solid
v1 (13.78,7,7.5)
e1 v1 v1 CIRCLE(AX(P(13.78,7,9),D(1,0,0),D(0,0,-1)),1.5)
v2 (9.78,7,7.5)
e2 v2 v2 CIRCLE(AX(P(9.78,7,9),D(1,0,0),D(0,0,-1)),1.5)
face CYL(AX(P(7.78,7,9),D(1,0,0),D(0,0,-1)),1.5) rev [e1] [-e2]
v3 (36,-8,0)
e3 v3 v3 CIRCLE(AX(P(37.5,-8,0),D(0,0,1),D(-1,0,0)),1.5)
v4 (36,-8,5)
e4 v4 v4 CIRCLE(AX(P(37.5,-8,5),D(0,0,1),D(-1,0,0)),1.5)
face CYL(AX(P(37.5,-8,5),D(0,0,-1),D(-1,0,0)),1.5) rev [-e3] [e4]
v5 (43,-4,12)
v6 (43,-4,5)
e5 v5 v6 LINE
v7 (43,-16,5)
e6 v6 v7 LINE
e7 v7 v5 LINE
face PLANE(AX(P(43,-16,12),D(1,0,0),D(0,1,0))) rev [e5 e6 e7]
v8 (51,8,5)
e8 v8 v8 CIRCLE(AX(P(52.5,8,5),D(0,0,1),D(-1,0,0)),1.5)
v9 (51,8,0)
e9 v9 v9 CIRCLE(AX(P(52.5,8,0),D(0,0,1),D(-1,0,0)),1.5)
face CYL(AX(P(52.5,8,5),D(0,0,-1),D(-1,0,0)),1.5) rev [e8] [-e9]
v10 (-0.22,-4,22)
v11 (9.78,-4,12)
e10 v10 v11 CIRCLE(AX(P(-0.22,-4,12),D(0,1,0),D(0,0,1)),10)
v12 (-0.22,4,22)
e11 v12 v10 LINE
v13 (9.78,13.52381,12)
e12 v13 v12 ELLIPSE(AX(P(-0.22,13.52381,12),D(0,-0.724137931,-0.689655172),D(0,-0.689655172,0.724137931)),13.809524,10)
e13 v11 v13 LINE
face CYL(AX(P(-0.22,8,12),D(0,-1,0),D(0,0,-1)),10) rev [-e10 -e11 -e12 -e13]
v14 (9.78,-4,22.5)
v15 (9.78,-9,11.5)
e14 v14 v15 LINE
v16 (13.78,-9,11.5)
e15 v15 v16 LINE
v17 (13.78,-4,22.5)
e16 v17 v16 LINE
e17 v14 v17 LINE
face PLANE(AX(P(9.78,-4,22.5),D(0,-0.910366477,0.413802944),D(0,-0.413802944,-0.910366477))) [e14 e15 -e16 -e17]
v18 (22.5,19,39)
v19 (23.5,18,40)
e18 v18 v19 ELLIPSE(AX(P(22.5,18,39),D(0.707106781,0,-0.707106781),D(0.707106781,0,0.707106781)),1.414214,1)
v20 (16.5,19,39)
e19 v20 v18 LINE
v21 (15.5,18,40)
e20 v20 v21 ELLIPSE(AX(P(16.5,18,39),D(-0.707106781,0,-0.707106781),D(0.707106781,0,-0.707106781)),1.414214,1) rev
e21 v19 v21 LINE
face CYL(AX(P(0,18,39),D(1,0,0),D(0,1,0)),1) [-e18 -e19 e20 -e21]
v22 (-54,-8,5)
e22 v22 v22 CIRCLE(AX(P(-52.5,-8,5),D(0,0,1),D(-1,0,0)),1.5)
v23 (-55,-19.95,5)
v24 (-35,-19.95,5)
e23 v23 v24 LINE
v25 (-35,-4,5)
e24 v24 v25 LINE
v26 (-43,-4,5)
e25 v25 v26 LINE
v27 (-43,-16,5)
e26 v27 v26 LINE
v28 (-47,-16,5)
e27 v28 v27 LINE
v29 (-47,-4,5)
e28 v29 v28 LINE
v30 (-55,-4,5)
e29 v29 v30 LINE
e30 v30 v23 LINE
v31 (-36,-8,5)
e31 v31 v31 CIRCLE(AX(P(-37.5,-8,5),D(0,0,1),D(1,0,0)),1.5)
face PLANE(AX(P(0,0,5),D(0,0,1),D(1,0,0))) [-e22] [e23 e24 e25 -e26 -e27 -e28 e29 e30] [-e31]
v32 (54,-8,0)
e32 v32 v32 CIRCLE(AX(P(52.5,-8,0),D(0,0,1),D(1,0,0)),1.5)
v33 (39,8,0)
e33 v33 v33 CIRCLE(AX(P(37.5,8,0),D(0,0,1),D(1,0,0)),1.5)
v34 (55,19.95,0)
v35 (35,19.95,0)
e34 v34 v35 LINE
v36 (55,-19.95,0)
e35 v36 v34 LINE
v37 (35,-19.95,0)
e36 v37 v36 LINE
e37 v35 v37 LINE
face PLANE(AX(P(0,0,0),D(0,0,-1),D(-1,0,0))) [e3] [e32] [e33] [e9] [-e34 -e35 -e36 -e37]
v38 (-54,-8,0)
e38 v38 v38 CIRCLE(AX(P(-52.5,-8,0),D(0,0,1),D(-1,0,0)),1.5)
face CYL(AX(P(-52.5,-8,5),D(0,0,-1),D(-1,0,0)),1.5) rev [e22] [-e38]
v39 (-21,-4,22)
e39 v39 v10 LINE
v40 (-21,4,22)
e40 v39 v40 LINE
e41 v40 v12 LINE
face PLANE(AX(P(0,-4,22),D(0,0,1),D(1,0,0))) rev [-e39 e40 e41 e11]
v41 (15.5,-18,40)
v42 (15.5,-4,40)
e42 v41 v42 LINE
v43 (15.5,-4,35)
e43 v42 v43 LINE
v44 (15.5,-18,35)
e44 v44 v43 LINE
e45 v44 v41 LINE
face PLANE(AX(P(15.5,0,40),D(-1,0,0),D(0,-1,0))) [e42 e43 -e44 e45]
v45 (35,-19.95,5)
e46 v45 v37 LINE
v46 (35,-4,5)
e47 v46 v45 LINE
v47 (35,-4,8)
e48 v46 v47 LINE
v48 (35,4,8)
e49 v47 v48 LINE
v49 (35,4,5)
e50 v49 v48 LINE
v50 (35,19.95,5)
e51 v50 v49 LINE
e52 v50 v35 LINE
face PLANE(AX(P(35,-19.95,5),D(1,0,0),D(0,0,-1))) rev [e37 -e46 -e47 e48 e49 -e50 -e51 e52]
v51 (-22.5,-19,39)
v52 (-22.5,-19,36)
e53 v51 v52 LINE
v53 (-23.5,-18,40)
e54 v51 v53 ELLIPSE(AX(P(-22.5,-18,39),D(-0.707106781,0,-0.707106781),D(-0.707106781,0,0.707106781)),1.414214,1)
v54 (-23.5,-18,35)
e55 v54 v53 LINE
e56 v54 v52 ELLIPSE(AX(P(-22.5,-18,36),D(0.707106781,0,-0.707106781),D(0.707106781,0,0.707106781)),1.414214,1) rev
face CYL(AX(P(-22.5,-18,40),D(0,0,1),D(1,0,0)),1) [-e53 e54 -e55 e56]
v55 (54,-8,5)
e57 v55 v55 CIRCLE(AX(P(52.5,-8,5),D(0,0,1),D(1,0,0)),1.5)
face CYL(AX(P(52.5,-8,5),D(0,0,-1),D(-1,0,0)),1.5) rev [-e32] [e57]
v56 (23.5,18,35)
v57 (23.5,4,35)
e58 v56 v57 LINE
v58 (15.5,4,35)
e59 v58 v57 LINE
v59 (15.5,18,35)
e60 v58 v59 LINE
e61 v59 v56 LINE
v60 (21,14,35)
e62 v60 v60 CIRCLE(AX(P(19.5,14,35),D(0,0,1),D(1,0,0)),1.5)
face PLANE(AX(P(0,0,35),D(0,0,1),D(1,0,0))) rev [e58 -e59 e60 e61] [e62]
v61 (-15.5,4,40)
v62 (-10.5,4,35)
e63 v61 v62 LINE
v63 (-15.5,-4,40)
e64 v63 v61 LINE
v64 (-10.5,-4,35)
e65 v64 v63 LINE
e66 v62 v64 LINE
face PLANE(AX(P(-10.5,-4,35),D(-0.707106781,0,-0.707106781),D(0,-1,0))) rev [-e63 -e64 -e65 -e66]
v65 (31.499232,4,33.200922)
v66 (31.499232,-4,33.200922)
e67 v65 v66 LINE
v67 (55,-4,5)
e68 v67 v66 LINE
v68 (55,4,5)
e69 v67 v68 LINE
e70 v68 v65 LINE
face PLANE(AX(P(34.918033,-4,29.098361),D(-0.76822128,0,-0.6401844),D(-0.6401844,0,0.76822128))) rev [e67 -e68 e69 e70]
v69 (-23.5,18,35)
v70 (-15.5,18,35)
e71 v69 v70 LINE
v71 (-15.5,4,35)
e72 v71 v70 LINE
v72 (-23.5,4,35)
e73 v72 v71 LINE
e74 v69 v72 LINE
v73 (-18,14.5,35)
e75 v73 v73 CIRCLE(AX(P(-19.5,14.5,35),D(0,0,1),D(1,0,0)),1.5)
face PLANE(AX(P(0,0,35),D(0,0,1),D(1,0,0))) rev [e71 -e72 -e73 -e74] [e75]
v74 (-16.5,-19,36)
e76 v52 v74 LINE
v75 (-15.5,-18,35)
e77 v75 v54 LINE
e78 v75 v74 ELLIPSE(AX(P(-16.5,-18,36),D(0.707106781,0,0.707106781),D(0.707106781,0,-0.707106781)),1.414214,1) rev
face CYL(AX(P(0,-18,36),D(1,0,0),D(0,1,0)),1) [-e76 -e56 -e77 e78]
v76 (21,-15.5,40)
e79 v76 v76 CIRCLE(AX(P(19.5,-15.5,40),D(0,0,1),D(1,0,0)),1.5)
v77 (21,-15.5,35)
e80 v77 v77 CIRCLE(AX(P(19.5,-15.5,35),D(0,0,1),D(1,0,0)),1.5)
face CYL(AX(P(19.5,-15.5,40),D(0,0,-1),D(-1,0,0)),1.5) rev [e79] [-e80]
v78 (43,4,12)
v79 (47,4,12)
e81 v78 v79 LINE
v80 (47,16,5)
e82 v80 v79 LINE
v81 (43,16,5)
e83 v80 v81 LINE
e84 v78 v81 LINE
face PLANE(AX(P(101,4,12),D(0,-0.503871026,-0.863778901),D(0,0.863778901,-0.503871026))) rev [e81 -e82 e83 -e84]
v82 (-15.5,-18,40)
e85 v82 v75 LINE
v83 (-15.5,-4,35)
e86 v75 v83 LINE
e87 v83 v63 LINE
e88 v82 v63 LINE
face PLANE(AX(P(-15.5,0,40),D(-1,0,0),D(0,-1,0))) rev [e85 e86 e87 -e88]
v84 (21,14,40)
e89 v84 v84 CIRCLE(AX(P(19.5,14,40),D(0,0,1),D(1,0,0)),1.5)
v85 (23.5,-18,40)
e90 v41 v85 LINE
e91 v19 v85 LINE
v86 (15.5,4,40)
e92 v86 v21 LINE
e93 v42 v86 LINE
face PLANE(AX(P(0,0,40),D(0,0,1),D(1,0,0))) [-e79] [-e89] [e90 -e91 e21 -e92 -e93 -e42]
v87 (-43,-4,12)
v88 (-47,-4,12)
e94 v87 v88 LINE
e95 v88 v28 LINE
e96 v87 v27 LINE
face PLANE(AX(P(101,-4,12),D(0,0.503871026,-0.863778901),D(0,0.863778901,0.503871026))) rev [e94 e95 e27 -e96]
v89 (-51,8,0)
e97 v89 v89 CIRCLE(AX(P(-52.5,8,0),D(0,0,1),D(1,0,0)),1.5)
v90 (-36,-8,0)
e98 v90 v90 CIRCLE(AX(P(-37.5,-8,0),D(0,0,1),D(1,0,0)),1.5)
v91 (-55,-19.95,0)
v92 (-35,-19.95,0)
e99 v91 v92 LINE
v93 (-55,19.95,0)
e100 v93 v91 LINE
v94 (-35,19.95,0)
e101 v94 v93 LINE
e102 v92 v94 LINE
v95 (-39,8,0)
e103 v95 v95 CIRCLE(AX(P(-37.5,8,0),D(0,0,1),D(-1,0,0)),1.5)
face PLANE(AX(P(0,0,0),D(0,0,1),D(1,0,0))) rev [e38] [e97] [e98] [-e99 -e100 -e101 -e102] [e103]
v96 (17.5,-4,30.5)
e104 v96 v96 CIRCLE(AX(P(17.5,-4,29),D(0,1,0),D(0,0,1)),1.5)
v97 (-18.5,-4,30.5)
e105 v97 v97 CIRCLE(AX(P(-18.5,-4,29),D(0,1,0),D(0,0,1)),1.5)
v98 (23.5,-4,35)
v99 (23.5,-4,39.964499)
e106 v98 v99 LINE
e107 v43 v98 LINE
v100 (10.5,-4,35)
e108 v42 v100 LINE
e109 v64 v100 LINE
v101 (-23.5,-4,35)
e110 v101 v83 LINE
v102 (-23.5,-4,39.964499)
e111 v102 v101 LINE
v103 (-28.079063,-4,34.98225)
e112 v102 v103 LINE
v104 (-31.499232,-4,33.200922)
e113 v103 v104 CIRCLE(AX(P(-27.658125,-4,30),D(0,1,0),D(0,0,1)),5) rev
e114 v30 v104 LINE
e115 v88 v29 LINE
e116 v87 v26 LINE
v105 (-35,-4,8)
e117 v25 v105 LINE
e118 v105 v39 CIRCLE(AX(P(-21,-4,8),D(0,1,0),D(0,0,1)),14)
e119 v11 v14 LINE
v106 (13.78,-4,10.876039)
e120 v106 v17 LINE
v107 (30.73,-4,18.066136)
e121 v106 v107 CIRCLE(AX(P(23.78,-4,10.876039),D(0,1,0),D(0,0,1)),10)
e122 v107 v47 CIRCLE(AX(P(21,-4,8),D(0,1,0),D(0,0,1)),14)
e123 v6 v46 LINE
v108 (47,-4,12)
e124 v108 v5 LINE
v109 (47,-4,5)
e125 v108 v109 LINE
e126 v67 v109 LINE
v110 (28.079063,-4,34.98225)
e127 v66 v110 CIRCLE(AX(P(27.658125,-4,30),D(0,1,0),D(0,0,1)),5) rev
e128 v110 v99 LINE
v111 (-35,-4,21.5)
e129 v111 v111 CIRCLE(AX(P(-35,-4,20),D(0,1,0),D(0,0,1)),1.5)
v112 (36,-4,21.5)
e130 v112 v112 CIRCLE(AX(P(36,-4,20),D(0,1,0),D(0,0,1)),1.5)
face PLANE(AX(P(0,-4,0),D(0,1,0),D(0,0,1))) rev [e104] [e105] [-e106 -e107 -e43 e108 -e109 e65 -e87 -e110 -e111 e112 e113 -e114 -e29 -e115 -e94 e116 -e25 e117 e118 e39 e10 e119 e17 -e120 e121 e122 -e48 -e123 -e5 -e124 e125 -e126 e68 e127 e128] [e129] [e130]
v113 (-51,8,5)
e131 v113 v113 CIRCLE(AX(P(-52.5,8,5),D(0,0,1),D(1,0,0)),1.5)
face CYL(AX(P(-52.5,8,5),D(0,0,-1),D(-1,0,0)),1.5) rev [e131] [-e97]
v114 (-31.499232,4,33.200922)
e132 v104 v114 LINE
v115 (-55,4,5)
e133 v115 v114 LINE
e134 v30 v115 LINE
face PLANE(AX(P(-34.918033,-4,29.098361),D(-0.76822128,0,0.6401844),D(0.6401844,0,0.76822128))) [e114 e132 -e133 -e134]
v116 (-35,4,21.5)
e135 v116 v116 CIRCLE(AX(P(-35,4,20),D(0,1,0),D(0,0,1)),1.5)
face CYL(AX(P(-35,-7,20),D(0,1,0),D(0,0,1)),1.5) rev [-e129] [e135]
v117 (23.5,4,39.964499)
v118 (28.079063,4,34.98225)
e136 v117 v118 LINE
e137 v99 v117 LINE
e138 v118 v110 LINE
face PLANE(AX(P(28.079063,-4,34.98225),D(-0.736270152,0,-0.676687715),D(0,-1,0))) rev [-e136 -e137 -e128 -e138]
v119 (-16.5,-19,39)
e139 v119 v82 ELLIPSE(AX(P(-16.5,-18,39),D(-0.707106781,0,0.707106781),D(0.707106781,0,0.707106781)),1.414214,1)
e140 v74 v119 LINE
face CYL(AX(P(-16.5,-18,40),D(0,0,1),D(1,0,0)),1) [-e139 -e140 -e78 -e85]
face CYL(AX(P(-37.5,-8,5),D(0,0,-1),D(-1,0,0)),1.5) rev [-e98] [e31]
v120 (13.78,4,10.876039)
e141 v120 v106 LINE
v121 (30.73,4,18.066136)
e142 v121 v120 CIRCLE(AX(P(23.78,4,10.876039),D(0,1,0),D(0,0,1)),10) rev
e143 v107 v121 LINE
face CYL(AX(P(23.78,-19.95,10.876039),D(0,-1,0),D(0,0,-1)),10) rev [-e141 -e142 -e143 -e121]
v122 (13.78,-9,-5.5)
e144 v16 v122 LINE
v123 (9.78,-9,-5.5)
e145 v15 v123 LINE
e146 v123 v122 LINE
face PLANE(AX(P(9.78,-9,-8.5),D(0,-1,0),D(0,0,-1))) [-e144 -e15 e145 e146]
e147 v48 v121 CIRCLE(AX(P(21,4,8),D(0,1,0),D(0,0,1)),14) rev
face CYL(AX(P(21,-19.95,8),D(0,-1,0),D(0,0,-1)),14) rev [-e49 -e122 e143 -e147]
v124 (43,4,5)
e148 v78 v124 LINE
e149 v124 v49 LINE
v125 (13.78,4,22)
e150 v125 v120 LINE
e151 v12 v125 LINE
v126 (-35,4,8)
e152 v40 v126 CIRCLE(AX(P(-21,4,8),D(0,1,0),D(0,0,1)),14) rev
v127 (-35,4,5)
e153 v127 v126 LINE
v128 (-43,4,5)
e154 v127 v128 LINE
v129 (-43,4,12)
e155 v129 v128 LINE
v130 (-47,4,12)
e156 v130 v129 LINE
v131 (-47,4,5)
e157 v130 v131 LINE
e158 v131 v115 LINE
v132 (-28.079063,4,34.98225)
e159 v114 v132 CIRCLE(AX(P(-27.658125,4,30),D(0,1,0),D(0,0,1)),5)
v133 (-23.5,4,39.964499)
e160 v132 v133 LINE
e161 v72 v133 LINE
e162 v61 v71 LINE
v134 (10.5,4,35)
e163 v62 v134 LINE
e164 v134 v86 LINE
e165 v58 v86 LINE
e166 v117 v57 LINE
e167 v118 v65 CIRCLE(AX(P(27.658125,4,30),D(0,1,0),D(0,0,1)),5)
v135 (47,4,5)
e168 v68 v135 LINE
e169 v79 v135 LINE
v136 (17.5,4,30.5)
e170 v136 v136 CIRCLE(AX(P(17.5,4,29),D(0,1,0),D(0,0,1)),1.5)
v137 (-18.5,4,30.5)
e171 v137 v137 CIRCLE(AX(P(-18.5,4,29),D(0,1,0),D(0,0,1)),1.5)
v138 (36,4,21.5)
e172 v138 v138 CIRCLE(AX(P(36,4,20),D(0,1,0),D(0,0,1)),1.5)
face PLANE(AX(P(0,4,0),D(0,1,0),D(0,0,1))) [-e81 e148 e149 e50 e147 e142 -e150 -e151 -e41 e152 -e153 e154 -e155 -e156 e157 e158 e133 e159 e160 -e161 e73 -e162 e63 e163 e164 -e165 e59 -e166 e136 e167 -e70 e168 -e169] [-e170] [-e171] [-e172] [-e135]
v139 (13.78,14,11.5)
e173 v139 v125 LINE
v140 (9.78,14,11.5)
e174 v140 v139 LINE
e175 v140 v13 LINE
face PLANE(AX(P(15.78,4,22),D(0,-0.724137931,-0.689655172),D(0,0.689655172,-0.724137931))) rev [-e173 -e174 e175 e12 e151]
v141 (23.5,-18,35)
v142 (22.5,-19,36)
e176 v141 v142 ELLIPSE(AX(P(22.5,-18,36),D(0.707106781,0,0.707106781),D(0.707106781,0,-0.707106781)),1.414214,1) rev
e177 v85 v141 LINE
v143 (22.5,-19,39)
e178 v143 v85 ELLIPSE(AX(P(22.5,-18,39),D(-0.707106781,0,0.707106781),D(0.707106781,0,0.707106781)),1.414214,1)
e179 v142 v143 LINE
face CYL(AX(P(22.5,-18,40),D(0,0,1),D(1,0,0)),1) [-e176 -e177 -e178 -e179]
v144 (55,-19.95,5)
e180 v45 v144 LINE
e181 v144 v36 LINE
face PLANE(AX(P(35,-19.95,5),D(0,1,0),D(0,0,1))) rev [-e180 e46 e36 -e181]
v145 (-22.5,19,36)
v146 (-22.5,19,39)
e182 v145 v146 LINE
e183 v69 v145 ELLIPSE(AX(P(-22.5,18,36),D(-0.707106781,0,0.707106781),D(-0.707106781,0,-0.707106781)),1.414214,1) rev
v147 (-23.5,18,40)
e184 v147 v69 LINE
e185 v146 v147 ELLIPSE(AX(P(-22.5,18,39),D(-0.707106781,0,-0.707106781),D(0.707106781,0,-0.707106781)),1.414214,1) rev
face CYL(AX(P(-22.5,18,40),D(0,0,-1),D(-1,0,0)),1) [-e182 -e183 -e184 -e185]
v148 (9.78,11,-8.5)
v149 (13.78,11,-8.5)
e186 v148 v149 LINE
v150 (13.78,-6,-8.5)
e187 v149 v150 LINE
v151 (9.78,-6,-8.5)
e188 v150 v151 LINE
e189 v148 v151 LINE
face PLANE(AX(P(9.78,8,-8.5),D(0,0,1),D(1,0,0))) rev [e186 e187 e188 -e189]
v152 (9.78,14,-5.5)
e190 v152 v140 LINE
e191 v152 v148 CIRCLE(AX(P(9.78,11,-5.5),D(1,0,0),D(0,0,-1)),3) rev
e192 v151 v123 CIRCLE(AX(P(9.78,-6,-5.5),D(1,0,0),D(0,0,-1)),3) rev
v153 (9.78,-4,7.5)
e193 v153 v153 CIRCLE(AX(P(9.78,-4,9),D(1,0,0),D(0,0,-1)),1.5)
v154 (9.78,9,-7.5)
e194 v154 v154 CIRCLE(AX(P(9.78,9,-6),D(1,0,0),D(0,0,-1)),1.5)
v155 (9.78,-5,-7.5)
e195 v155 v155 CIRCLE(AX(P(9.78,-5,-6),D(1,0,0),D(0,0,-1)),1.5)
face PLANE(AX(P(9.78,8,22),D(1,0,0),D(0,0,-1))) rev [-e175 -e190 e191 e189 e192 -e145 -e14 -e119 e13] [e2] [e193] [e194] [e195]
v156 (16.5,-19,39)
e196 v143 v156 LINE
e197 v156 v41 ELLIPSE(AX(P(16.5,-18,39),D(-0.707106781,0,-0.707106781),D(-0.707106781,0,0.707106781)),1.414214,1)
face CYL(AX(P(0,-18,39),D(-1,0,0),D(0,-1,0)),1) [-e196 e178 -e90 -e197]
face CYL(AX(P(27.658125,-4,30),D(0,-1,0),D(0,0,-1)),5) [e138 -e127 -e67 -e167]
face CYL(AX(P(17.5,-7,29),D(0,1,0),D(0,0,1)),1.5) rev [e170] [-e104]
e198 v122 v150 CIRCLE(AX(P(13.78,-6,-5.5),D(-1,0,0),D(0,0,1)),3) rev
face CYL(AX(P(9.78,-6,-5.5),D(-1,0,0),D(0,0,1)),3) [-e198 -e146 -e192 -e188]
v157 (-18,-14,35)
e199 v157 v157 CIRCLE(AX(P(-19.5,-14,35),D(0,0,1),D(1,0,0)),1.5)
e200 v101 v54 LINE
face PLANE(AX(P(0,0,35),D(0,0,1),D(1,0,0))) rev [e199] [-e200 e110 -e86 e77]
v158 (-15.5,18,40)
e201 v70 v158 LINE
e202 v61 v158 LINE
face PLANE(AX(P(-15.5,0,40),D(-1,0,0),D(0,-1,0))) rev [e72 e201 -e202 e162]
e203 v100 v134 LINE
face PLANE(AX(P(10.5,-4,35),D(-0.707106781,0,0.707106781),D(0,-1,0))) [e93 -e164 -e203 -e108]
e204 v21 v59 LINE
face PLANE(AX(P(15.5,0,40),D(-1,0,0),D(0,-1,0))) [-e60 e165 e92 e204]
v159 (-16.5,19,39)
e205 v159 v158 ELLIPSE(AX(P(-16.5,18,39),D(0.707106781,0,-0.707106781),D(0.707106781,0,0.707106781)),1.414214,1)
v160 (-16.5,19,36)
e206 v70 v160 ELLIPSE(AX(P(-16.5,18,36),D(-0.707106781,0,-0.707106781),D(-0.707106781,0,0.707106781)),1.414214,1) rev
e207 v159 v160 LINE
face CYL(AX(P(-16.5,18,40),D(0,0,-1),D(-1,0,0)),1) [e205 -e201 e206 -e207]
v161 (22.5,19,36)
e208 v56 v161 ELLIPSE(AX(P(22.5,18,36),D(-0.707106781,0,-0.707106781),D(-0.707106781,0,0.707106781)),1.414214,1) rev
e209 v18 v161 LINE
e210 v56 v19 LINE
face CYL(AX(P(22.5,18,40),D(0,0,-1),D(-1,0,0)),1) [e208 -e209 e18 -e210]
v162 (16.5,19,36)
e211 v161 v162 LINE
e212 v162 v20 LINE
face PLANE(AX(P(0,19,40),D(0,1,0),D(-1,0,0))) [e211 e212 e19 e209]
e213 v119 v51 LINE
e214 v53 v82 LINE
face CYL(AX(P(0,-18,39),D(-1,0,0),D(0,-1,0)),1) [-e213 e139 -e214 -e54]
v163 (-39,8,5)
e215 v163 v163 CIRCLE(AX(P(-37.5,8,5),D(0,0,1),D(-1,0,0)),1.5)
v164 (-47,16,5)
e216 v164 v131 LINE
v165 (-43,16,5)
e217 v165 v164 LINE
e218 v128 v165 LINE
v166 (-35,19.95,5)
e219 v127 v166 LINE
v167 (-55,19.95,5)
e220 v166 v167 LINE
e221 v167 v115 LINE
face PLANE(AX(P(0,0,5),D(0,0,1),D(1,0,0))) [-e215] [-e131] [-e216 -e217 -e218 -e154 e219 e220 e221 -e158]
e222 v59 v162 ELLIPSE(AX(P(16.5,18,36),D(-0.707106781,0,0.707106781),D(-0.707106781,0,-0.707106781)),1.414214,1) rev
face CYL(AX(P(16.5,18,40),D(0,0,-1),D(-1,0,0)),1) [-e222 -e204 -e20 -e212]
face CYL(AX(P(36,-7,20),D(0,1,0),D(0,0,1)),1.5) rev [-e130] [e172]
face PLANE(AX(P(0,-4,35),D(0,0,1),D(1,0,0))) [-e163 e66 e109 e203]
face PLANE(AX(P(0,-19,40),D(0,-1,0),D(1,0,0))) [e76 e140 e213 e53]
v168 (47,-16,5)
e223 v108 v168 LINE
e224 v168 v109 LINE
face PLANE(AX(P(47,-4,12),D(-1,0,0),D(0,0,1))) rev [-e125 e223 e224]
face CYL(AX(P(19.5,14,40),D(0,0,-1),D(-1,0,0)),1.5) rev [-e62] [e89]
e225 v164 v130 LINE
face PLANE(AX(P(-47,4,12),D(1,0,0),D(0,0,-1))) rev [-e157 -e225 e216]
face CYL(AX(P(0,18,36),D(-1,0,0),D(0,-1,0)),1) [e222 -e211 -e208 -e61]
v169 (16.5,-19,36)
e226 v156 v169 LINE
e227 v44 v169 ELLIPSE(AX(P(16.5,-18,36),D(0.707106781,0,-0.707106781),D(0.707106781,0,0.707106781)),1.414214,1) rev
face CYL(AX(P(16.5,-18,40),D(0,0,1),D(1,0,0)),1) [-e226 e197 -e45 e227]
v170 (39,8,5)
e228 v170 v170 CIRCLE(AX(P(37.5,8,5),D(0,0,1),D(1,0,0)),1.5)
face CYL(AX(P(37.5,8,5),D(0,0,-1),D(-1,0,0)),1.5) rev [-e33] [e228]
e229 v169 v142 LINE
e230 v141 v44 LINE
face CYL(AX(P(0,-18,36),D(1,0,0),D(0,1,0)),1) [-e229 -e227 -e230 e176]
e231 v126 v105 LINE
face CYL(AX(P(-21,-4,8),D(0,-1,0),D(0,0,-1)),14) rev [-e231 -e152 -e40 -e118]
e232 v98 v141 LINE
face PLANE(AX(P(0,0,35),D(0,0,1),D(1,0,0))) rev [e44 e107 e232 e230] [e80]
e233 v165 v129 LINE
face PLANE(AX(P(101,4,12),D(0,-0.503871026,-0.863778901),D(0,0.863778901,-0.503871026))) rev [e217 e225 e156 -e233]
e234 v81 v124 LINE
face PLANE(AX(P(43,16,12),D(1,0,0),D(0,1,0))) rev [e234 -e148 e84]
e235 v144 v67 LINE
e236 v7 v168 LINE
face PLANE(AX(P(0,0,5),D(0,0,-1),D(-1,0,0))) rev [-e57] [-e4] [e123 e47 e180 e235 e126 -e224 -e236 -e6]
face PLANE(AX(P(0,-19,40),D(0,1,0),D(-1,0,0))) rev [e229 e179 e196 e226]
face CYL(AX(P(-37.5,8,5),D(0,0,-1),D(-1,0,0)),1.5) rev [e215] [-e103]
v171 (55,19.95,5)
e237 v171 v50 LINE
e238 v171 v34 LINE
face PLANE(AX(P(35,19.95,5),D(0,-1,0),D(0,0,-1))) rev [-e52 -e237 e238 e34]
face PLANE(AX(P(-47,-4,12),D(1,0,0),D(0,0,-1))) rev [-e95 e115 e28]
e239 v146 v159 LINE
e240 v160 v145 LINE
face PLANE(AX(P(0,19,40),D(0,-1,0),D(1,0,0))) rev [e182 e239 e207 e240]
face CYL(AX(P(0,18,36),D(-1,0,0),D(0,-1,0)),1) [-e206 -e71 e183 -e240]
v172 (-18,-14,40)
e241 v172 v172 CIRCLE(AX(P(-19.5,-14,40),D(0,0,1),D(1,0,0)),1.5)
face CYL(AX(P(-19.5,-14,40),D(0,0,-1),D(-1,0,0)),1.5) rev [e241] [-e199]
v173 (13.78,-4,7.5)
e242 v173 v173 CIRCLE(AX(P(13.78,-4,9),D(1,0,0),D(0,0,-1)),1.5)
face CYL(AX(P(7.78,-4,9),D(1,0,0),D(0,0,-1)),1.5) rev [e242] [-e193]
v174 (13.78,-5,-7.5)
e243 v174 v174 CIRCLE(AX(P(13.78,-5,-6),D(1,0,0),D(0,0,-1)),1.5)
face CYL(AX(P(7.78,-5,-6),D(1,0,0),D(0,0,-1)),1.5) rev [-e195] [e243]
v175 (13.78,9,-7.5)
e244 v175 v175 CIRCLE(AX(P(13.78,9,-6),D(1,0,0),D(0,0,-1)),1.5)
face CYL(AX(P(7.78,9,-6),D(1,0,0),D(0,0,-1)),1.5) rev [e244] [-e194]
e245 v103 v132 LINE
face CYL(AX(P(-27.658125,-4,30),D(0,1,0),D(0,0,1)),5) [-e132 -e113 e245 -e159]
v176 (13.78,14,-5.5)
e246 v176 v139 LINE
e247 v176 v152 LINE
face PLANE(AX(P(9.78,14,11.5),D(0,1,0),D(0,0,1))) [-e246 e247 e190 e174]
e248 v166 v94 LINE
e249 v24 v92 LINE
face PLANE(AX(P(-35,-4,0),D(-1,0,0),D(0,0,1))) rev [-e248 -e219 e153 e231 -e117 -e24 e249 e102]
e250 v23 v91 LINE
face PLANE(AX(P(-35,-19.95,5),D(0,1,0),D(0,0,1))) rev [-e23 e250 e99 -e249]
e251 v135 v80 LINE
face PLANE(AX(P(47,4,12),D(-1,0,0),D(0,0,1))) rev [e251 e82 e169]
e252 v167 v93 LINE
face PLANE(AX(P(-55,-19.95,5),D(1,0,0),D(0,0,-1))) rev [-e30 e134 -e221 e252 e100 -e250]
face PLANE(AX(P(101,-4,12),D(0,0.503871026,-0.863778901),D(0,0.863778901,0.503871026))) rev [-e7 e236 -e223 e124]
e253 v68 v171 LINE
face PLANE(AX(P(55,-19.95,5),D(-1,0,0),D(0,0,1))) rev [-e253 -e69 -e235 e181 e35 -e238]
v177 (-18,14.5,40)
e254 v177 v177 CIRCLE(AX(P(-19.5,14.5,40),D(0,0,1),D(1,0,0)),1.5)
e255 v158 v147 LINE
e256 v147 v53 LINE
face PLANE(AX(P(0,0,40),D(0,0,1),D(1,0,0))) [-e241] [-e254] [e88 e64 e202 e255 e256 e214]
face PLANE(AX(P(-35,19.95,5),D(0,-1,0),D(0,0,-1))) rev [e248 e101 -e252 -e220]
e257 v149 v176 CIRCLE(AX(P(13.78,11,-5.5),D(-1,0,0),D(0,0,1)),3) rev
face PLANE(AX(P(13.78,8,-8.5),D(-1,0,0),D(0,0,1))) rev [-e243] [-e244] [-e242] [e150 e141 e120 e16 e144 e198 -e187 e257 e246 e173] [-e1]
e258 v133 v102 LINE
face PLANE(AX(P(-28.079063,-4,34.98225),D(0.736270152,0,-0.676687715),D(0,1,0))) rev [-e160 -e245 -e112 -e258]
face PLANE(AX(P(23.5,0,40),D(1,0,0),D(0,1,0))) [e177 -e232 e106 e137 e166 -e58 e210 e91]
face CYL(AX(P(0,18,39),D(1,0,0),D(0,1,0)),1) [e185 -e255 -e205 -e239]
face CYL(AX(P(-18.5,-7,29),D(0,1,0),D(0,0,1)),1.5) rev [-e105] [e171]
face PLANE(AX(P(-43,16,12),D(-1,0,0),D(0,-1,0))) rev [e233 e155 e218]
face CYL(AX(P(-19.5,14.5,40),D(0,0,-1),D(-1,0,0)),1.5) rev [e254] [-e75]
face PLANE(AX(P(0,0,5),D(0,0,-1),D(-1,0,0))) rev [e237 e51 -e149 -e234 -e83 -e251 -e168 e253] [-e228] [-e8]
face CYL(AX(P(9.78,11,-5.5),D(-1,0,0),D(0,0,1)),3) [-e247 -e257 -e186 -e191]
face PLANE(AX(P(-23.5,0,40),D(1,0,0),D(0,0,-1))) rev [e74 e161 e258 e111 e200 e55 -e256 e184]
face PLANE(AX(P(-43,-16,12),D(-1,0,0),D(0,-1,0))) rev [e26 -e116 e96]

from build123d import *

# Parameters (mm, degrees)
SKETCH_1_W           = 20
SKETCH_1_H           = 39.9
SKETCH_1_R           = 1.5
EXTRUDE_1_DEPTH      = 5
EXTRUDE_1_2_DEPTH    = 5
EXTRUDE_2_DEPTH      = 4
EXTRUDE_2_DEPTH_BACK = 4
FILLET_1_R           = 14
SKETCH_3_R           = 1.5
CUT_EXTRUDE_1_DEPTH  = 11
FILLET_2_R           = 5
SKETCH_4_W           = 4
SKETCH_4_H           = 12
EXTRUDE_3_DEPTH      = 7
CUT_EXTRUDE_2_DEPTH  = 148
EXTRUDE_4_DEPTH      = 4
EXTRUDE_4_DEPTH_BACK = 8
SKETCH_6_W           = 4
SKETCH_6_H           = 30.5
SKETCH_10_W          = 20
SKETCH_10_H          = 6
SKETCH_10_H_2        = 5
EXTRUDE_6_DEPTH      = 4
CUT_EXTRUDE_5_DEPTH  = 6
SKETCH_13_R          = 1.5
CUT_EXTRUDE_6_DEPTH  = 6
EXTRUDE_8_DEPTH      = 4
SKETCH_19_W          = 8
SKETCH_19_H          = 15
SKETCH_19_R          = 1.5
SKETCH_19_H_2        = 8
EXTRUDE_9_DEPTH      = 5
CHAMFER_START        = -4
CHAMFER_1_DEPTH      = 8
FILLET_13_R          = 1
FILLET_14_R          = 10
FILLET_15_R          = 3


with BuildPart() as part:
    # 草图1 → 凸台-拉伸1 (new body)
    with BuildSketch(Plane.XY):
        with Locations((45, 0)):
            Rectangle(SKETCH_1_W, SKETCH_1_H)
        with Locations((37.5, 8)):
            Circle(SKETCH_1_R, mode=Mode.SUBTRACT)
        with Locations(Location((52.5, 8, 0), (0, 0, 180))):
            Circle(SKETCH_1_R, mode=Mode.SUBTRACT)
        with Locations((52.5, -8)):
            Circle(SKETCH_1_R, mode=Mode.SUBTRACT)
        with Locations(Location((37.5, -8, 0), (0, 0, 180))):
            Circle(SKETCH_1_R, mode=Mode.SUBTRACT)
    extrude(amount=EXTRUDE_1_DEPTH)



with BuildPart() as body_2:
    # 草图1 → Extrude 1 2 (new body)
    with BuildSketch(Plane.XY):
        with Locations((-45, 0)):
            Rectangle(SKETCH_1_W, SKETCH_1_H)
        with Locations((-37.5, -8)):
            Circle(SKETCH_1_R, mode=Mode.SUBTRACT)
        with Locations(Location((-52.5, -8, 0), (0, 0, 180))):
            Circle(SKETCH_1_R, mode=Mode.SUBTRACT)
        with Locations((-52.5, 8)):
            Circle(SKETCH_1_R, mode=Mode.SUBTRACT)
        with Locations(Location((-37.5, 8, 0), (0, 0, 180))):
            Circle(SKETCH_1_R, mode=Mode.SUBTRACT)
    extrude(amount=EXTRUDE_1_2_DEPTH)


with BuildPart() as part_1:
    add(part.part)

    add(body_2.part)  # 凸台-拉伸2 merges body 2
    # 草图2 → 凸台-拉伸2 (add, two sides: drawn at the far end of the back side and taken through both)
    with BuildSketch(Plane(origin=(0, 0, 0), x_dir=(1, 0, 0), z_dir=(0, 1, 0)).offset(-EXTRUDE_2_DEPTH_BACK)):
        Polygon((-35, -5), (-55, -5), (-30, -35), (30, -35), (55, -5), (35, -5), (35, -22), (-35, -22), align=None)
    extrude(amount=EXTRUDE_2_DEPTH + EXTRUDE_2_DEPTH_BACK)

    # 圆角1
    fillet_1_edges = [part_1.edges().sort_by_distance(p)[0] for p in [
        (-35, 0, 22),
        (35, 0, 22),
    ]]
    fillet(fillet_1_edges, radius=FILLET_1_R)

    # 草图3 → 切除-拉伸1 (cut)
    with BuildSketch(Plane(origin=(0, 4, 0), x_dir=(1, 0, 0), z_dir=(0, 1, 0))):
        with Locations(Location((17.5, -29, 0), (0, 0, 270))):
            Circle(SKETCH_3_R)
        with Locations(Location((-18.5, -29, 0), (0, 0, 270))):
            Circle(SKETCH_3_R)
        with Locations(Location((-35, -20, 0), (0, 0, 270))):
            Circle(SKETCH_3_R)
        with Locations(Location((36, -20, 0), (0, 0, 270))):
            Circle(SKETCH_3_R)
    extrude(amount=-CUT_EXTRUDE_1_DEPTH, mode=Mode.SUBTRACT)

    # 圆角2
    fillet_2_edges = [part_1.edges().sort_by_distance(p)[0] for p in [
        (30, 0, 35),
        (-30, 0, 35),
    ]]
    fillet(fillet_2_edges, radius=FILLET_2_R)

    # 草图4 → 凸台-拉伸3 (add)
    with BuildSketch(Plane.XY.offset(5)):
        with Locations((-45, 10)):
            Rectangle(SKETCH_4_W, SKETCH_4_H)
        with Locations((-45, -10)):
            Rectangle(SKETCH_4_W, SKETCH_4_H)
        with Locations((45, -10)):
            Rectangle(SKETCH_4_W, SKETCH_4_H)
        with Locations((45, 10)):
            Rectangle(SKETCH_4_W, SKETCH_4_H)
    extrude(amount=EXTRUDE_3_DEPTH)

    # 草图5 → 切除-拉伸2 (cut)
    with BuildSketch(Plane.ZY.offset(47)):
        Polygon((5, 16), (12, 16), (12, 4), align=None)
        Polygon((12, -16), (12, -4), (5, -16), align=None)
    extrude(amount=-CUT_EXTRUDE_2_DEPTH, mode=Mode.SUBTRACT)

    # 草图6 → 凸台-拉伸4 (add, two sides: drawn at the far end of the back side and taken through both)
    with BuildSketch(Plane(origin=(0, 4, 0), x_dir=(1, 0, 0), z_dir=(0, 1, 0)).offset(-EXTRUDE_4_DEPTH_BACK)):
        with Locations((11.78, -6.75)):
            Rectangle(SKETCH_6_W, SKETCH_6_H)
    extrude(amount=EXTRUDE_4_DEPTH + EXTRUDE_4_DEPTH_BACK)

    # 草图10 → 凸台-拉伸6 (add)
    with BuildSketch(Plane(origin=(13.78, 0, 0), x_dir=(0, 0, -1), z_dir=(1, 0, 0))):
        with Locations((-1.5, 11)):
            Rectangle(SKETCH_10_W, SKETCH_10_H)
        with Locations((-1.5, -6.5)):
            Rectangle(SKETCH_10_W, SKETCH_10_H_2)
    extrude(amount=-EXTRUDE_6_DEPTH)

    # 草图11 → 切除-拉伸5 (cut)
    with BuildSketch(Plane.ZY.offset(-9.78)):
        Polygon((17.8, 8), (22, 8), (22, 4), align=None)
    extrude(amount=-CUT_EXTRUDE_5_DEPTH, mode=Mode.SUBTRACT)

    # 草图13 → 切除-拉伸6 (cut)
    with BuildSketch(Plane(origin=(13.78, 0, 0), x_dir=(0, 0, -1), z_dir=(1, 0, 0))):
        with Locations((6, 9)):
            Circle(SKETCH_13_R)
        with Locations((6, -5)):
            Circle(SKETCH_13_R)
        with Locations((-9, 7)):
            Circle(SKETCH_13_R)
        with Locations((-9, -4)):
            Circle(SKETCH_13_R)
    extrude(amount=-CUT_EXTRUDE_6_DEPTH, mode=Mode.SUBTRACT)

    # 草图18 → 凸台-拉伸8 (add)
    with BuildSketch(Plane(origin=(13.78, 0, 0), x_dir=(0, 0, -1), z_dir=(1, 0, 0))):
        Polygon((-11.5, -9), (-11.5, -4), (-22.5, -4), align=None)
        Polygon((-17.8, 8), (-11.5, 14), (-11.5, 8), align=None)
    extrude(amount=-EXTRUDE_8_DEPTH)

    # 草图19 → 凸台-拉伸9 (add)
    # profile 1 of 6: a face of its own
    with BuildSketch(Plane.XY.offset(35)):
        with Locations((-19.5, 11.5)):
            Rectangle(SKETCH_19_W, SKETCH_19_H)
        with Locations((-19.5, 14.5)):
            Circle(SKETCH_19_R, mode=Mode.SUBTRACT)
    # profile 2 of 6: a face of its own
    with BuildSketch(Plane.XY.offset(35)):
        with Locations((-19.5, 0)):
            Rectangle(SKETCH_19_W, SKETCH_19_H_2)
    # profile 3 of 6: a face of its own
    with BuildSketch(Plane.XY.offset(35)):
        with Locations((-19.5, -11.5)):
            Rectangle(SKETCH_19_W, SKETCH_19_H)
        with Locations((-19.5, -14)):
            Circle(SKETCH_19_R, mode=Mode.SUBTRACT)
    # profile 4 of 6: a face of its own
    with BuildSketch(Plane.XY.offset(35)):
        with Locations((19.5, 11.5)):
            Rectangle(SKETCH_19_W, SKETCH_19_H)
        with Locations((19.5, 14)):
            Circle(SKETCH_19_R, mode=Mode.SUBTRACT)
    # profile 5 of 6: a face of its own
    with BuildSketch(Plane.XY.offset(35)):
        with Locations((19.5, 0)):
            Rectangle(SKETCH_19_W, SKETCH_19_H_2)
    # profile 6 of 6: a face of its own
    with BuildSketch(Plane.XY.offset(35)):
        with Locations((19.5, -11.5)):
            Rectangle(SKETCH_19_W, SKETCH_19_H)
        with Locations((19.5, -15.5)):
            Circle(SKETCH_19_R, mode=Mode.SUBTRACT)
    extrude(amount=EXTRUDE_9_DEPTH)

    # 倒角1: read off the stored shape, not the designer's step
    # 倒角1 outline → 倒角1 (add)
    with BuildSketch(Plane(origin=(0, 0, 0), x_dir=(1, 0, 0), z_dir=(0, 1, 0)).offset(CHAMFER_START)):
        with BuildLine():
            Line((23.5, -39.964499332), (28.079062635, -34.982249666))
            ThreePointArc((28.079062635, -34.982249666), (27.868780996, -34.995560446), (27.65812527, -35))
            Line((27.65812527, -35), (23.5, -35))
            Line((23.5, -35), (23.5, -39.964499332))
        make_face()
        with BuildLine():
            Line((-28.079062635, -34.982249666), (-23.5, -39.964499332))
            Line((-23.5, -39.964499332), (-23.5, -35))
            Line((-23.5, -35), (-27.65812527, -35))
            ThreePointArc((-27.65812527, -35), (-27.868780996, -34.995560446), (-28.079062635, -34.982249666))
        make_face()
        Polygon((15.5, -35), (10.5, -35), (15.5, -40), align=None)
        Polygon((-15.5, -40), (-10.5, -35), (-15.5, -35), align=None)
    extrude(amount=CHAMFER_1_DEPTH)

    # 圆角13
    fillet_13_edges = [part_1.edges().sort_by_distance(p)[0] for p in [
        (-19.5, -19, 35),
        (-19.5, 19, 35),
        (-15.5, 19, 37.5),
        (-23.5, 19, 37.5),
        (-19.5, -19, 40),
        (-23.5, -19, 37.5),
        (-15.5, -19, 37.5),
        (-19.5, 19, 40),
        (15.5, 19, 37.5),
        (19.5, -19, 35),
        (15.5, -19, 37.5),
        (23.5, -19, 37.5),
        (19.5, 19, 40),
        (23.5, 19, 37.5),
        (19.5, -19, 40),
        (19.5, 19, 35),
    ]]
    fillet(fillet_13_edges, radius=FILLET_13_R)

    # 圆角14
    # the kernel refuses this fillet: 10 mm, written as the material it adds along each edge
    with BuildSketch(Plane(origin=(13.78, -4, 22), x_dir=(0.9741093226814803, 0, -0.2260774811099678), z_dir=(0, 1, 0))) as fillet_14_piece_1:
        with BuildLine():
            CenterArc((12.255970323, 8.57517936), FILLET_14_R, 166.93375399, 134.02721721)
            Line((2.514877096, 10.835954171), (1.540767773, 11.062031652))
            Line((1.540767773, 11.062031652), (-0.974109323, 0.226077481))
            Line((-0.974109323, 0.226077481), (-0.226077481, -0.974109323))
            ThreePointArc((-0.226077481, -0.974109323), (6.806991829, -2.606388736), (17.914965085, -0.857517936))
            Line((17.914965085, -0.857517936), (17.400511016, 0))
        make_face()
    extrude(amount=8)
    with BuildSketch(Plane(origin=(9.78, -4, 22), x_dir=(-1, 0, 0), z_dir=(0, 1, 0))) as fillet_14_piece_2_section:
        with BuildLine():
            CenterArc((FILLET_14_R, -FILLET_14_R), FILLET_14_R, 90, 90)
            Line((0, -FILLET_14_R), (0, 0))
            Line((0, 0), (FILLET_14_R, 0))
        make_face()
    fillet_14_piece_2 = extrude(amount=8, mode=Mode.PRIVATE)
    fillet_14_piece_2 = split(fillet_14_piece_2, bisect_by=Plane(origin=(9.78, 0.195005945, 25.995243757), z_dir=(0, -0.7241379310344828, -0.6896551724137933)), keep=Keep.TOP, mode=Mode.PRIVATE)
    add(fillet_14_piece_2)
    with BuildSketch(Plane(origin=(9.78, -4, 22), x_dir=(-1, 0, 0), z_dir=(0, 1, 0))) as fillet_14_piece_3_section:
        with BuildLine():
            CenterArc((FILLET_14_R, -FILLET_14_R), FILLET_14_R, 90, 90)
            Line((0, -FILLET_14_R), (0, 0))
            Line((0, 0), (FILLET_14_R, 0))
        make_face()
    fillet_14_piece_3 = extrude(amount=33, mode=Mode.PRIVATE)
    fillet_14_piece_3 = split(fillet_14_piece_3, bisect_by=Plane(origin=(9.78, 4, 22), z_dir=(0, 1, 0)), keep=Keep.TOP, mode=Mode.PRIVATE)
    fillet_14_piece_3 = split(fillet_14_piece_3, bisect_by=Plane(origin=(9.78, 0.195005945, 25.995243757), z_dir=(0, -0.7241379310344828, -0.6896551724137933)), keep=Keep.TOP, mode=Mode.PRIVATE)
    add(fillet_14_piece_3)

    # 圆角15
    fillet_15_edges = [part_1.edges().sort_by_distance(p)[0] for p in [
        (11.78, 14, -8.5),
        (11.78, -9, -8.5),
    ]]
    fillet(fillet_15_edges, radius=FILLET_15_R)


solid = part_1.part
